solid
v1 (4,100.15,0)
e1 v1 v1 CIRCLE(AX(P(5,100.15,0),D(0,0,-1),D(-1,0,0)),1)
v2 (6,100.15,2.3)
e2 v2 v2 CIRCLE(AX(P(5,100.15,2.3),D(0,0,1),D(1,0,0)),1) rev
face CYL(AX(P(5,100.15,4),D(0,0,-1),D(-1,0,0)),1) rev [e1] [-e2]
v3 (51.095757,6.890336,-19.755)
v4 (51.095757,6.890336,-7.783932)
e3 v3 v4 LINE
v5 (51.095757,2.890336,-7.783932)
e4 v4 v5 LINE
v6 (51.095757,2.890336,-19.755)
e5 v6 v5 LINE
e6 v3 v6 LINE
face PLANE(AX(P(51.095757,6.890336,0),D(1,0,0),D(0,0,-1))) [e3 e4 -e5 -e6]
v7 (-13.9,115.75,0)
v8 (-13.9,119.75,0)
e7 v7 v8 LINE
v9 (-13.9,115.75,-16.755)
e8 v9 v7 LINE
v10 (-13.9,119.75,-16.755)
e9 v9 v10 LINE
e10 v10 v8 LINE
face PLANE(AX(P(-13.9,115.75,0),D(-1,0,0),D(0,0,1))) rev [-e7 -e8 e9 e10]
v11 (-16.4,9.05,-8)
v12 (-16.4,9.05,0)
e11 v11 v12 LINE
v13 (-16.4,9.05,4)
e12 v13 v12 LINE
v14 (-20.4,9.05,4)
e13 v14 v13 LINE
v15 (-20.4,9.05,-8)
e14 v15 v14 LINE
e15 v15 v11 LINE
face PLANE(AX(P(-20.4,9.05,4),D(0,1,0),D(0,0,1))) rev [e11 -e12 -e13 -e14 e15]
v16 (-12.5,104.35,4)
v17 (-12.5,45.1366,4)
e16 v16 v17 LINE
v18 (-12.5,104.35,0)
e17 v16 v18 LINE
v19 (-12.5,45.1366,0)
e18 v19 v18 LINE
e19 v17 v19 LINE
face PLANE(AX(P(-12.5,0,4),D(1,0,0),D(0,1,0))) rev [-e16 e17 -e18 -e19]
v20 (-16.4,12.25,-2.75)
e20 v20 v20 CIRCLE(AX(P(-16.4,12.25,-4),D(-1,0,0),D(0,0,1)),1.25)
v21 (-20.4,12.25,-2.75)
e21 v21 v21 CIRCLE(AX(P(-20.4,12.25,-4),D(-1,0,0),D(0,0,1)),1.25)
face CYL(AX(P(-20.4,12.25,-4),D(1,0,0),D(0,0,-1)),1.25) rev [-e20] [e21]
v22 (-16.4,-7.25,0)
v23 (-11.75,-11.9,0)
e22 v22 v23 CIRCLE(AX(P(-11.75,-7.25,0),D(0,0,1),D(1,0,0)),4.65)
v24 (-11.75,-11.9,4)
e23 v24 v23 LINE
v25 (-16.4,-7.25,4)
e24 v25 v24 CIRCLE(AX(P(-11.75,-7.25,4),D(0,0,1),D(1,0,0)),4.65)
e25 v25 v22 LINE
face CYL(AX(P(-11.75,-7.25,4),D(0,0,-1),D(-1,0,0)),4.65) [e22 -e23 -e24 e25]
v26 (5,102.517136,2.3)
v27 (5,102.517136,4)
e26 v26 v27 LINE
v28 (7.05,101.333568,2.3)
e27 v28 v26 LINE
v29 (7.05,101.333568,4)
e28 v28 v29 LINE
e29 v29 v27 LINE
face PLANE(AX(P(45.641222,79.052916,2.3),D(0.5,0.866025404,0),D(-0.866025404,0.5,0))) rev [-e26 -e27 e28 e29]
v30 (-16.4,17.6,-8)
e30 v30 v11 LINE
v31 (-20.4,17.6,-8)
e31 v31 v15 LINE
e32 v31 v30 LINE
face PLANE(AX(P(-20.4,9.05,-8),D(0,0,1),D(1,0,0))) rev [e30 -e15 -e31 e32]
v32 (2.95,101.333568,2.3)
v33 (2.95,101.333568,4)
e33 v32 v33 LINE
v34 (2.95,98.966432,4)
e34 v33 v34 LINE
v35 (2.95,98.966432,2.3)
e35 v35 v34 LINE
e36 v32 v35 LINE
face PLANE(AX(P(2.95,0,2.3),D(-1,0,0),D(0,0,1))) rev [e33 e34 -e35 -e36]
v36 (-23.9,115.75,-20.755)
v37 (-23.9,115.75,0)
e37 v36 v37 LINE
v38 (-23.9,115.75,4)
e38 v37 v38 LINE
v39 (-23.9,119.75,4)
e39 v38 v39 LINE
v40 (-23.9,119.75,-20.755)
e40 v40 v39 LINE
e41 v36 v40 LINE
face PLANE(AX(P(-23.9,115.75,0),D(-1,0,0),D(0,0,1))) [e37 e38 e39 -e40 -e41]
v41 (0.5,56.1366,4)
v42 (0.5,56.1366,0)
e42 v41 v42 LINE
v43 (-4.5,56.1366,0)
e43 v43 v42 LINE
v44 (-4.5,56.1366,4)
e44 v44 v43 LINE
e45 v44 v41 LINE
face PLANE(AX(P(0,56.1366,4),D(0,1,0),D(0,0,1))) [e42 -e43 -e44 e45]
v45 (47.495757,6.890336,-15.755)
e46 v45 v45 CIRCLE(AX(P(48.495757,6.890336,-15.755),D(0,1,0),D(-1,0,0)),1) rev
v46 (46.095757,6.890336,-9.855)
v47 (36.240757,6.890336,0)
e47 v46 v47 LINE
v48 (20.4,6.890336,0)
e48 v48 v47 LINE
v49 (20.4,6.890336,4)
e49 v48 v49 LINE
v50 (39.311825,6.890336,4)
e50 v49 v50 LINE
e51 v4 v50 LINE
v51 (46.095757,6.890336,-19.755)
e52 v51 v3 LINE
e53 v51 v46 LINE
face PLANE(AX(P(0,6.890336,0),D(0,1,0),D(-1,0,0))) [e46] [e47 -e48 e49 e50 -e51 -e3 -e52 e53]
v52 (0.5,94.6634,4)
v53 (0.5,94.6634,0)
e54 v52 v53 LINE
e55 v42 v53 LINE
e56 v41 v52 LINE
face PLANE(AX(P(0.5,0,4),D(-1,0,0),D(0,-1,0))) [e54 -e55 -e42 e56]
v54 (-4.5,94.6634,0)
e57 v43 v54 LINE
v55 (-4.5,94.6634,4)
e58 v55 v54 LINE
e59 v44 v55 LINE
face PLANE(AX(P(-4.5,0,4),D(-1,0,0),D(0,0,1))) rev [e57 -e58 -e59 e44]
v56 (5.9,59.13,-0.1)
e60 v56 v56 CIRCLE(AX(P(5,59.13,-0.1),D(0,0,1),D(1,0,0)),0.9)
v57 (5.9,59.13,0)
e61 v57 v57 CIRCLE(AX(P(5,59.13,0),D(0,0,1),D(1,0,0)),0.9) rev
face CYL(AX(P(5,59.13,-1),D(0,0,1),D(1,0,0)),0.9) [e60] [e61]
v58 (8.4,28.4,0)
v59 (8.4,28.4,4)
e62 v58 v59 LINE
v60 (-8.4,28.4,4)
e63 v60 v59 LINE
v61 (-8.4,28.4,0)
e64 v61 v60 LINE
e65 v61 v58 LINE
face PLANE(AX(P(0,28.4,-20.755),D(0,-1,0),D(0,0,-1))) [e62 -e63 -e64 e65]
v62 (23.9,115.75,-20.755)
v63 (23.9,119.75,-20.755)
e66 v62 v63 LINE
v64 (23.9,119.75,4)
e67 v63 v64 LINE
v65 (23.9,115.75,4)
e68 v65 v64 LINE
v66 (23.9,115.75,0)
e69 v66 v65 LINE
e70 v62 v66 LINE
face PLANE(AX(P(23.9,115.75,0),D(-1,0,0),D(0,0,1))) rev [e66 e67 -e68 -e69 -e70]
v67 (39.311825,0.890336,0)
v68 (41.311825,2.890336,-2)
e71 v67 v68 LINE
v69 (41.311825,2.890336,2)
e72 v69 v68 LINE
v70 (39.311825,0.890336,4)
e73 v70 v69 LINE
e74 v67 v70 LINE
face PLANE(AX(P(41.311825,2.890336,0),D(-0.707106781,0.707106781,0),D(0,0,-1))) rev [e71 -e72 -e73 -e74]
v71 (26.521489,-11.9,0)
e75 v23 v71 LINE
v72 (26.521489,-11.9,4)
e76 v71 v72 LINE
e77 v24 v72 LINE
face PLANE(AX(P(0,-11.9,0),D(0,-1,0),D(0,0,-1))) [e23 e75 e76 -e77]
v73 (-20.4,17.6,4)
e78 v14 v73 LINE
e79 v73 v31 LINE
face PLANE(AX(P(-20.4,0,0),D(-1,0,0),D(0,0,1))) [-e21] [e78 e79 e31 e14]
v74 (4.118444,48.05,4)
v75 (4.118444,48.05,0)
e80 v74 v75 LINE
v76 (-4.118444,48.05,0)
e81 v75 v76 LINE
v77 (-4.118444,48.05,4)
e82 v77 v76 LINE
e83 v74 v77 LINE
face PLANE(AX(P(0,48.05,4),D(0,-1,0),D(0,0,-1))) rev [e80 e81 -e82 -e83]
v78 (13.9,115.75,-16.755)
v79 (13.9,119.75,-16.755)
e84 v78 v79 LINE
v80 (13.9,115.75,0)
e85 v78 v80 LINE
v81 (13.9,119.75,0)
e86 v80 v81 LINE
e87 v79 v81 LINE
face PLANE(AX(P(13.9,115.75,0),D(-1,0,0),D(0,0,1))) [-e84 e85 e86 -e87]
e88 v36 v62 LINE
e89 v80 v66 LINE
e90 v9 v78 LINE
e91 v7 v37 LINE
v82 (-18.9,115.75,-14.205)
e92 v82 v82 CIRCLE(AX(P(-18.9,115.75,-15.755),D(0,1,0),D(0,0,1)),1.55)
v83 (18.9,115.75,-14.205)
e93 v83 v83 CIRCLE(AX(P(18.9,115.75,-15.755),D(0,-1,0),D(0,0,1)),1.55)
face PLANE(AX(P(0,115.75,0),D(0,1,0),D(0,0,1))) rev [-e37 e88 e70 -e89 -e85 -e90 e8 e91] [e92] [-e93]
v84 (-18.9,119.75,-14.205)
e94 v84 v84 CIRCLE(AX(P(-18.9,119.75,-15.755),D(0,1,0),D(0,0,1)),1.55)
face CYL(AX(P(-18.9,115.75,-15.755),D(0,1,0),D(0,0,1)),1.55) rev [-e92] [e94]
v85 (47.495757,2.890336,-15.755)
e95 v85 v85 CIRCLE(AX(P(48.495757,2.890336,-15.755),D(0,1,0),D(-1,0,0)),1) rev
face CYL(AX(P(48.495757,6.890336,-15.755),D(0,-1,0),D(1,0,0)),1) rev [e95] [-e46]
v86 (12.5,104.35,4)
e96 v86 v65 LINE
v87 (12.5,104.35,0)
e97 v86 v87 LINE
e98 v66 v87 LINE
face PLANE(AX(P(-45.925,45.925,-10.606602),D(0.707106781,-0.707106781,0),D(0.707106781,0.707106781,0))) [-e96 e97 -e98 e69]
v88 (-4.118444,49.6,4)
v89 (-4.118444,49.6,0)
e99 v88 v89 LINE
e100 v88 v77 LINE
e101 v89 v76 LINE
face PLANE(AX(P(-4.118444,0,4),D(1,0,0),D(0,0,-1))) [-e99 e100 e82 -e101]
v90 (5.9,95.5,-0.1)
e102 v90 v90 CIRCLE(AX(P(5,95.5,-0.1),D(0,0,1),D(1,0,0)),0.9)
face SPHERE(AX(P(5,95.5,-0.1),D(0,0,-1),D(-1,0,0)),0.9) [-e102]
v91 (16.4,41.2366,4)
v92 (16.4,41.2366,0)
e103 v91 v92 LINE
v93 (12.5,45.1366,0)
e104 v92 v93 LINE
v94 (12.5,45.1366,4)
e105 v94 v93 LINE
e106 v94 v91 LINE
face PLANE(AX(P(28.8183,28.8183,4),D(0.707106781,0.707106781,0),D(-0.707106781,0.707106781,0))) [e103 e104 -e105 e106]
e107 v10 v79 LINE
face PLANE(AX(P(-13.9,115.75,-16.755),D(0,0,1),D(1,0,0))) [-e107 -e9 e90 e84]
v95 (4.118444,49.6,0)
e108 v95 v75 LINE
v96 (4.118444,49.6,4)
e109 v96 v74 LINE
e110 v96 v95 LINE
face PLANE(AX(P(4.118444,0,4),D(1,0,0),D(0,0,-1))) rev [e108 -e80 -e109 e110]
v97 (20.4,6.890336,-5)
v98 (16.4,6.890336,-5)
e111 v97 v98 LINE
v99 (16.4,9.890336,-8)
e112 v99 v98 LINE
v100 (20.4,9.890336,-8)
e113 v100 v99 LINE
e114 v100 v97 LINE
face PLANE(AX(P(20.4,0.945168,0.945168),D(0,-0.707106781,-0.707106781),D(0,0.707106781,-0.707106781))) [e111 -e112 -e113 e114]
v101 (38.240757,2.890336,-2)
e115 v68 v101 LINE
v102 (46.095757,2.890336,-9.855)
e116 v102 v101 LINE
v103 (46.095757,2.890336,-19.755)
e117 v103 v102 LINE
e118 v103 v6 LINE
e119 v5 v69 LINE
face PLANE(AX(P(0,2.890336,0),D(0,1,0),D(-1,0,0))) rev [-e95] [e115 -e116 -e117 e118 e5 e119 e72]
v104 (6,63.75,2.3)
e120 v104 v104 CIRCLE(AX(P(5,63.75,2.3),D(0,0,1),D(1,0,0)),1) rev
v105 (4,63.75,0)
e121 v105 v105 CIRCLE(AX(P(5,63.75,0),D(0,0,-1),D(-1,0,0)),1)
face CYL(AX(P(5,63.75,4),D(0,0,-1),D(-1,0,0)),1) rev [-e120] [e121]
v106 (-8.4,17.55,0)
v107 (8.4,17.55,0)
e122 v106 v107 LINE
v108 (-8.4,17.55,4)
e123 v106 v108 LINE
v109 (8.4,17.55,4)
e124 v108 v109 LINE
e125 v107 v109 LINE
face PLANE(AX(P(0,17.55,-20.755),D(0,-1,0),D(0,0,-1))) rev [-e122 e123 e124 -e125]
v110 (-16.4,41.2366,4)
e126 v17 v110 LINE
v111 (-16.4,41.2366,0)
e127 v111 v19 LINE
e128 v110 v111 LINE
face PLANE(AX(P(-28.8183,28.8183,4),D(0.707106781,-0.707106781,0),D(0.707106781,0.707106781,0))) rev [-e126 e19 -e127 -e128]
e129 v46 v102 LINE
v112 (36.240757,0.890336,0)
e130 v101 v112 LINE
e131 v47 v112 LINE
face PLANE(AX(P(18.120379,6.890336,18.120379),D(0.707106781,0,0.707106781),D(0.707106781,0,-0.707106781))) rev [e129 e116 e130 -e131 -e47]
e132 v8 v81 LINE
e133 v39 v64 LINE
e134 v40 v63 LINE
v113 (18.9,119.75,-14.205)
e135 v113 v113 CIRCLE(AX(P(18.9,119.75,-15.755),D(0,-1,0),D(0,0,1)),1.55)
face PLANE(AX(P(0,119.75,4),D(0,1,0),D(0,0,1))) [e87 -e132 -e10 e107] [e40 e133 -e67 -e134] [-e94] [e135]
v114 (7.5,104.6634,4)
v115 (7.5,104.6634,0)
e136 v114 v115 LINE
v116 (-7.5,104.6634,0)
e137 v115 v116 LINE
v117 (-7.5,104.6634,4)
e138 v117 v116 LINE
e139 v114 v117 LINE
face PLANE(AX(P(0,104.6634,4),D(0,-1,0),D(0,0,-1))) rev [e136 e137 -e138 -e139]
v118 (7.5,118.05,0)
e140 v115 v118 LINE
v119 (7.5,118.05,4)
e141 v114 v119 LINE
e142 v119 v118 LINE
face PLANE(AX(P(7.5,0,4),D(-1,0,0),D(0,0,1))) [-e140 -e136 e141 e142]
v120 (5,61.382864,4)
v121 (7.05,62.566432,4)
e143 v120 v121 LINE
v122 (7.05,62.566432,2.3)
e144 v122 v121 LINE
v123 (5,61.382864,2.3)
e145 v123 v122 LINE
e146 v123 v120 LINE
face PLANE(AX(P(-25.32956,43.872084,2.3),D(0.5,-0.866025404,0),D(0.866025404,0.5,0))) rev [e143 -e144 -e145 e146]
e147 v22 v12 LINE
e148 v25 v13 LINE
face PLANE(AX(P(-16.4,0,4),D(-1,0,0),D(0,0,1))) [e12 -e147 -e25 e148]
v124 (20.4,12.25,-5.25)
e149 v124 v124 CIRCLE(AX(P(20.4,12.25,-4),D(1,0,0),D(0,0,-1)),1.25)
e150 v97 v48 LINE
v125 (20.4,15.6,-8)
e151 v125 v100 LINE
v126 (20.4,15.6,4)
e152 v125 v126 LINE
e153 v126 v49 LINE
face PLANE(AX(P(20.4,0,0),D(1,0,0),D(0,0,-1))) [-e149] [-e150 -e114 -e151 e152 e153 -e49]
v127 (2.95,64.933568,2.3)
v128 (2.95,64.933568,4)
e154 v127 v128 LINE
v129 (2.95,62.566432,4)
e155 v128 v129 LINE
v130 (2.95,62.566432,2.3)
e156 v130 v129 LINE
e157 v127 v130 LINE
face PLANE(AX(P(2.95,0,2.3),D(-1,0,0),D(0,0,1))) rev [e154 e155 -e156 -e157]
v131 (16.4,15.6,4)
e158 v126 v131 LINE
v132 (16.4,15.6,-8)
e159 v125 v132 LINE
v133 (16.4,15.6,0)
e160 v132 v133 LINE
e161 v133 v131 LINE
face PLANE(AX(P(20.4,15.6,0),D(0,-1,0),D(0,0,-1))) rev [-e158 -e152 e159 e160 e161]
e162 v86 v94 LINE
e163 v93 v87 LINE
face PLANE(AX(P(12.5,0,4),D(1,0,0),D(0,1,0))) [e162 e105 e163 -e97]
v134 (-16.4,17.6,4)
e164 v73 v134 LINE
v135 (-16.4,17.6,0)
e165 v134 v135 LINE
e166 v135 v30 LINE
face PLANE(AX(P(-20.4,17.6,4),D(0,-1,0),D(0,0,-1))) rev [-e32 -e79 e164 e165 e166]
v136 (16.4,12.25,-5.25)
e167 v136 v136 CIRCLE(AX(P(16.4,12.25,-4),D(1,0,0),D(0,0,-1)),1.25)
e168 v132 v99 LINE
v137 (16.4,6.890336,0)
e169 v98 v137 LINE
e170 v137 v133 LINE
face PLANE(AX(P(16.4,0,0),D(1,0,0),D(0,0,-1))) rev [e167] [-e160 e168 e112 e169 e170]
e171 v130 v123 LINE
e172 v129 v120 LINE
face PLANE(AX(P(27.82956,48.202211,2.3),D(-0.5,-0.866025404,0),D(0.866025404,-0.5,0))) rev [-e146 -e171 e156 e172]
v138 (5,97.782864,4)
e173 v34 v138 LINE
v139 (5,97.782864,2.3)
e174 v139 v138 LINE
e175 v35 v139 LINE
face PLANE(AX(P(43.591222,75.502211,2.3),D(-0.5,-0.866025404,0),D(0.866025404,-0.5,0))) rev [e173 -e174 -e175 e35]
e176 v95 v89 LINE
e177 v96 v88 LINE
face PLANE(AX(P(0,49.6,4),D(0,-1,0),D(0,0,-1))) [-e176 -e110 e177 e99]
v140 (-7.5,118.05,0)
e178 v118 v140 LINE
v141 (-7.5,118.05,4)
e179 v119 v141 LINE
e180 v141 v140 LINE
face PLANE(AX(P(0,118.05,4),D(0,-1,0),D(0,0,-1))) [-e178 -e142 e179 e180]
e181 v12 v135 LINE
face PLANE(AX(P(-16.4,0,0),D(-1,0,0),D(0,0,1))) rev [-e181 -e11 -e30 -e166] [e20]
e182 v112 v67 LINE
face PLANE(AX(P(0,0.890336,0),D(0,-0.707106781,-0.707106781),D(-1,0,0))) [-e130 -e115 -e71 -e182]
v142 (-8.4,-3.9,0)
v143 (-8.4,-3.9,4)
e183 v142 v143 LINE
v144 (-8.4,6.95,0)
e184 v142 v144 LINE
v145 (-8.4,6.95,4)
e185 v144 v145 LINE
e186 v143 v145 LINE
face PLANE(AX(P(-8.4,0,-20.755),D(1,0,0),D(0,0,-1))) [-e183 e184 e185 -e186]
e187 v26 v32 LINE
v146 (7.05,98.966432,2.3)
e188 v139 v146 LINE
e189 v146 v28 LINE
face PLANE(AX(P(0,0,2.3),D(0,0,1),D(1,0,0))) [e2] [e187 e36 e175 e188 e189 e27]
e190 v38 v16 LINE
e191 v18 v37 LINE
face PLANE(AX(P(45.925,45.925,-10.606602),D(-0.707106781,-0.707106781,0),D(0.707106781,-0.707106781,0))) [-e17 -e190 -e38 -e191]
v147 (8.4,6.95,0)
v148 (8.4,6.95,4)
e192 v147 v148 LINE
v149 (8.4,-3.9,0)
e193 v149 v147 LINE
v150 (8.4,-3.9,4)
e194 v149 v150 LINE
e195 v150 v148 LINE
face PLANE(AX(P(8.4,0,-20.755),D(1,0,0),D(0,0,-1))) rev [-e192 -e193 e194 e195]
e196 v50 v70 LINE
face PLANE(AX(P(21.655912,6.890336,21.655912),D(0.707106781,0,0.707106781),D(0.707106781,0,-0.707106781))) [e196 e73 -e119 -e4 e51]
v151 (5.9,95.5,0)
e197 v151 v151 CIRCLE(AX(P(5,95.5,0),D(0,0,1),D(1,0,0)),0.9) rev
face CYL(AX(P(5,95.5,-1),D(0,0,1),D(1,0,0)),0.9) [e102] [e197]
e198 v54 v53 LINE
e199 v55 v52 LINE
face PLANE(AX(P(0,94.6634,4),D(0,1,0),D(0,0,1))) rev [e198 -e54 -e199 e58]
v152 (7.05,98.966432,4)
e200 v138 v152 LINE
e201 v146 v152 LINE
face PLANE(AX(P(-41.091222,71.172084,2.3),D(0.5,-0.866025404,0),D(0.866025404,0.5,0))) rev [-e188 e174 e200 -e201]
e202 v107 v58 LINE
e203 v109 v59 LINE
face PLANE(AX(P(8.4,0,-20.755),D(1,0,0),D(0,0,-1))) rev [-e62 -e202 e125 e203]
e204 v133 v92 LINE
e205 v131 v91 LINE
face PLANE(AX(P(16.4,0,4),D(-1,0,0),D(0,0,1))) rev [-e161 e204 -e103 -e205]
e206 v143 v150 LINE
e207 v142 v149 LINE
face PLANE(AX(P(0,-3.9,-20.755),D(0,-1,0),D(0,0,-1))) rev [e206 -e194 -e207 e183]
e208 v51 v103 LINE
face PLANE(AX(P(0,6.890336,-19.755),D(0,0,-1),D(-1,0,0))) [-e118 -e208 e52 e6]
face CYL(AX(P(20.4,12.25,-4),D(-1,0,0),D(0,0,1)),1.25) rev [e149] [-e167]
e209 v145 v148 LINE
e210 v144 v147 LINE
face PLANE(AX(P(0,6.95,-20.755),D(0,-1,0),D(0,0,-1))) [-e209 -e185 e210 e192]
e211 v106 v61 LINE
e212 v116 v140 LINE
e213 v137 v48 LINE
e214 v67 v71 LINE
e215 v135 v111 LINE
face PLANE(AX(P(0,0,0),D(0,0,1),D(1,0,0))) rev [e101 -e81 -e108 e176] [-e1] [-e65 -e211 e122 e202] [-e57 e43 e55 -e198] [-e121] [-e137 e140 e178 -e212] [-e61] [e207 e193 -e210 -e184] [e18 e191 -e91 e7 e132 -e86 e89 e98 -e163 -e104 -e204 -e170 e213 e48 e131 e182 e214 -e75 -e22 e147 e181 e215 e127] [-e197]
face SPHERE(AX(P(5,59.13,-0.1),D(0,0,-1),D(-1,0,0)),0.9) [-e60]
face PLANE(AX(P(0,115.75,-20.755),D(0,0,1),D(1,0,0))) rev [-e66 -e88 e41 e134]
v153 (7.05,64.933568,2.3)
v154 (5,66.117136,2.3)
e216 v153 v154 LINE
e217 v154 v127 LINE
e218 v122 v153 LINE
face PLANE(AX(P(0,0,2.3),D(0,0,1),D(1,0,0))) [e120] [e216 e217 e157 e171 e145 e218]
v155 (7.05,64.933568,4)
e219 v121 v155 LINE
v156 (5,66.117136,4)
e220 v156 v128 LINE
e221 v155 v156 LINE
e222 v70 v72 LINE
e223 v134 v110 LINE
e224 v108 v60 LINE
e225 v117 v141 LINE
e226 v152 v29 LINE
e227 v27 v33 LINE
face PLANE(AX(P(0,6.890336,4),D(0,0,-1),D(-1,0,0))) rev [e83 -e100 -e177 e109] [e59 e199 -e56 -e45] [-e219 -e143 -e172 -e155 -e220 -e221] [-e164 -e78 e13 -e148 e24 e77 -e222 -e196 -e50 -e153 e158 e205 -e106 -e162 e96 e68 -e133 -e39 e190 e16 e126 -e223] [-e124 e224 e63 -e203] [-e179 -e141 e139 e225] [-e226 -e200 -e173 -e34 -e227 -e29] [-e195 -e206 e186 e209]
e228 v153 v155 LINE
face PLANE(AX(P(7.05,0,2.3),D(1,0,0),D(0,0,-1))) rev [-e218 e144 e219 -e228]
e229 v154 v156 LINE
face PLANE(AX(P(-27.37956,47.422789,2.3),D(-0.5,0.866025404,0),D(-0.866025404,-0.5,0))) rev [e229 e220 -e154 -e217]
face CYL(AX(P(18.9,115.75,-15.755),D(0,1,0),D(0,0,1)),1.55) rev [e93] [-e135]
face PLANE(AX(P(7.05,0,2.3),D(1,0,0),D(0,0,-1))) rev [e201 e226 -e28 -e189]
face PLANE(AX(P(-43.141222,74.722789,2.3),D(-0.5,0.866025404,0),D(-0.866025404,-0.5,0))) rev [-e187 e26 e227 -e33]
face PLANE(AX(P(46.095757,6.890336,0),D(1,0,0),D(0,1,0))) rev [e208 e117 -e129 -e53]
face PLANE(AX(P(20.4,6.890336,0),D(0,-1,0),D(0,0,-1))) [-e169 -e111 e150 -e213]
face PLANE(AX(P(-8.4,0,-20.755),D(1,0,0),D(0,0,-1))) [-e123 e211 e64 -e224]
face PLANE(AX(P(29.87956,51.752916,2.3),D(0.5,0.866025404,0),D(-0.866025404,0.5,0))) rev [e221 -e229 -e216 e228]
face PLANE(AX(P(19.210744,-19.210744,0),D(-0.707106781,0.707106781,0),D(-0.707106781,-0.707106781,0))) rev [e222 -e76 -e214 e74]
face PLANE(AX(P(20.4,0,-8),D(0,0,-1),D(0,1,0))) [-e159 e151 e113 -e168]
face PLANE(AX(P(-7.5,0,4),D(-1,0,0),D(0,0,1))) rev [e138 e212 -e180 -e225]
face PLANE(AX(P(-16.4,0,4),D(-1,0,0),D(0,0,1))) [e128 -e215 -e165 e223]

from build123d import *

# Parameters (mm, degrees)
EXTRUDE_1_DEPTH     = 4
SKETCH_2_W          = 15
SKETCH_2_H          = 13.3866
CUT_EXTRUDE_1_DEPTH = 121.93395925
SKETCH_3_W          = 10
SKETCH_3_H          = 10
SKETCH_3_R          = 1.55
SKETCH_3_H_2        = 14.755
EXTRUDE_2_DEPTH     = 4
EXTRUDE_3_DEPTH     = 4
EXTRUDE_4_DEPTH     = 4
SKETCH_7_W          = 27.8
SKETCH_7_H          = 4
EXTRUDE_5_DEPTH     = 4
EXTRUDE_START       = -4
EXTRUDE_6_DEPTH     = 4
SKETCH_11_W         = 16.8
SKETCH_11_H         = 10.85
CUT_EXTRUDE_2_DEPTH = 133.52791749
CHAMFER_1_SIZE      = 2
CHAMFER_2_SIZE      = 2
SKETCH_12_W         = 12
SKETCH_12_H         = 8.55
SKETCH_12_R         = 1.25
EXTRUDE_7_DEPTH     = 4
EXTRUDE_START_2     = 4
SKETCH_13_R         = 1.25
SKETCH_13_W         = 4
SKETCH_13_H         = 8.709663749
EXTRUDE_8_DEPTH     = 4
SKETCH_14_R         = 1
CUT_EXTRUDE_3_DEPTH = 132.839329922
SKETCH_15_R         = 0.9
EXTRUDE_9_DEPTH     = 1
FILLET_1_R          = 0.9
CUT_EXTRUDE_START   = -1.7
SKETCH_16_R         = 1
CUT_EXTRUDE_4_DEPTH = 1.7
CUT_EXTRUDE_5_DEPTH = 132.839329922
SKETCH_19_W         = 5
SKETCH_19_H         = 38.5268
SKETCH_19_W_2       = 8.236887868
SKETCH_19_H_2       = 1.55
CUT_EXTRUDE_6_DEPTH = 132.839329922


with BuildPart() as part:
    # 草图1 → 凸台-拉伸1 (new body)
    with BuildSketch(Plane.XY):
        with BuildLine():
            Line((-16.4, -7.25), (-16.4, 119.75))
            Line((-16.4, 119.75), (16.4, 119.75))
            Line((16.4, 119.75), (16.4, -7.25))
            ThreePointArc((16.4, -7.25), (15.038046533, -10.538046533), (11.75, -11.9))
            Line((11.75, -11.9), (-11.75, -11.9))
            ThreePointArc((-11.75, -11.9), (-15.038046533, -10.538046533), (-16.4, -7.25))
        make_face()
    extrude(amount=EXTRUDE_1_DEPTH)

    # 草图2 → 切除-拉伸1 (cut, through all)
    with BuildSketch(Plane(origin=(0, 0, 0), x_dir=(-1, 0, 0), z_dir=(0, 0, -1))):
        with Locations((0, 111.3567)):
            Rectangle(SKETCH_2_W, SKETCH_2_H)
    extrude(amount=-CUT_EXTRUDE_1_DEPTH, mode=Mode.SUBTRACT)

    # 草图3 → 凸台-拉伸2 (add)
    # profile 1 of 2: a face of its own
    with BuildSketch(Plane(origin=(0, 119.75, 0), x_dir=(1, 0, 0), z_dir=(0, 1, 0))):
        with Locations((-18.9, 15.755)):
            Rectangle(SKETCH_3_W, SKETCH_3_H)
        with Locations(Location((-18.9, 15.755, 0), (0, 0, 270))):
            Circle(SKETCH_3_R, mode=Mode.SUBTRACT)
    # profile 2 of 2: a face of its own
    with BuildSketch(Plane(origin=(0, 119.75, 0), x_dir=(1, 0, 0), z_dir=(0, 1, 0))):
        with Locations((-18.9, 3.3775)):
            Rectangle(SKETCH_3_W, SKETCH_3_H_2)
    extrude_2 = extrude(amount=-EXTRUDE_2_DEPTH)

    # 镜向1: 凸台-拉伸2 across plane
    add(extrude_2.mirror(Plane(origin=(0, 0, 0), x_dir=(0, 0, 1), z_dir=(1, 0, 0))))

    # 草图6 → 凸台-拉伸4 (add)
    with BuildSketch(Plane.XY.offset(4)):
        Polygon((-16.4, 115.75), (-23.9, 115.75), (-16.4, 108.25), align=None)
        Polygon((16.4, 115.75), (16.4, 108.25), (23.9, 115.75), align=None)
    extrude(amount=-EXTRUDE_4_DEPTH)

    # 草图7 → 凸台-拉伸5 (add)
    with BuildSketch(Plane(origin=(0, 119.75, 0), x_dir=(1, 0, 0), z_dir=(0, 1, 0))):
        with Locations((0, 18.755)):
            Rectangle(SKETCH_7_W, SKETCH_7_H)
    extrude(amount=-EXTRUDE_5_DEPTH)



with BuildPart() as body_2:
    # 草图5 → 凸台-拉伸3 (new body)
    with BuildSketch(Plane(origin=(0, 2.890336251, 0), x_dir=(1, 0, 0), z_dir=(0, 1, 0))):
        Polygon((50.795757056, 9.855), (46.095757056, 9.855), (32.240757056, -4), (39.311824868, -4), (51.095757056, 7.783932188), (51.095757056, 9.855), align=None)
        with BuildLine():
            Line((50.795757056, 19.755), (46.095757056, 19.755))
            Line((46.095757056, 19.755), (46.095757056, 9.855))
            Line((46.095757056, 9.855), (50.795757056, 9.855))
            Line((50.795757056, 9.855), (50.795757056, 15.105))
            Line((50.795757056, 15.105), (49.255691264, 15.105))
            ThreePointArc((49.255691264, 15.105), (47.495757056, 15.755), (49.255691264, 16.405))
            Line((49.255691264, 16.405), (50.795757056, 16.405))
            Line((50.795757056, 16.405), (50.795757056, 19.755))
        make_face()
        with BuildLine():
            Line((51.095757056, 19.755), (50.795757056, 19.755))
            Line((50.795757056, 19.755), (50.795757056, 16.405))
            Line((50.795757056, 16.405), (49.255691264, 16.405))
            ThreePointArc((49.255691264, 16.405), (49.433822674, 16.10145764), (49.495757056, 15.755))
            ThreePointArc((49.495757056, 15.755), (49.433822674, 15.40854236), (49.255691264, 15.105))
            Line((49.255691264, 15.105), (50.795757056, 15.105))
            Line((50.795757056, 15.105), (50.795757056, 9.855))
            Line((50.795757056, 9.855), (51.095757056, 9.855))
            Line((51.095757056, 9.855), (51.095757056, 19.755))
        make_face()
    extrude(amount=EXTRUDE_3_DEPTH)


with BuildPart() as part_1:
    add(part.part)

    add(body_2.part)  # 凸台-拉伸6 merges body 2
    # 草图8 → 凸台-拉伸6 (add)
    with BuildSketch(Plane.XY.offset(4).offset(EXTRUDE_START)):
        with BuildLine():
            Line((26.521488617, -11.9), (39.311824868, 0.890336251))
            Line((39.311824868, 0.890336251), (39.311824868, 6.890336251))
            Line((39.311824868, 6.890336251), (16.4, 6.890336251))
            Line((16.4, 6.890336251), (16.4, -7.25))
            ThreePointArc((16.4, -7.25), (15.038046533, -10.538046533), (11.75, -11.9))
            Line((11.75, -11.9), (26.521488617, -11.9))
        make_face()
    extrude(amount=EXTRUDE_6_DEPTH)

    # 草图11 → 切除-拉伸2 (cut, through all)
    with BuildSketch(Plane.XY.offset(4)):
        with Locations((0, 1.525)):
            Rectangle(SKETCH_11_W, SKETCH_11_H)
        with Locations((0, 22.975)):
            Rectangle(SKETCH_11_W, SKETCH_11_H)
    extrude(amount=-CUT_EXTRUDE_2_DEPTH, mode=Mode.SUBTRACT)

    # 倒角1
    chamfer_1_edges = [part_1.edges().sort_by_distance(p)[0] for p in [
        (39.311824868, 2.890336251, 2),
    ]]
    chamfer(chamfer_1_edges, length=CHAMFER_1_SIZE - 0.0001)  # a hair under: the kernel refuses the full size

    # 倒角2
    chamfer_2_edges = [part_1.edges().sort_by_distance(p)[0] for p in [
        (38.776240962, 2.890336251, 0),
    ]]
    chamfer(chamfer_2_edges, length=CHAMFER_2_SIZE - 0.0001)  # a hair under: the kernel refuses the full size

    # 草图12 → 凸台-拉伸7 (add)
    with BuildSketch(Plane.ZY.offset(16.4)):
        with Locations((-2, 13.325)):
            Rectangle(SKETCH_12_W, SKETCH_12_H)
        with Locations((-4, 12.25)):
            Circle(SKETCH_12_R, mode=Mode.SUBTRACT)
    extrude(amount=EXTRUDE_7_DEPTH)

    # 草图13 → 凸台-拉伸8 (add)
    # profile 1 of 2: a face of its own
    with BuildSketch(Plane(origin=(16.4, 0, 0), x_dir=(0, 0, -1), z_dir=(1, 0, 0)).offset(EXTRUDE_START_2)):
        Polygon((8, 9.890336251), (8, 15.6), (0, 15.6), (0, 6.890336251), (5, 6.890336251), align=None)
        with Locations(Location((4, 12.25, 0), (0, 0, 180))):
            Circle(SKETCH_13_R, mode=Mode.SUBTRACT)
    # profile 2 of 2: a face of its own
    with BuildSketch(Plane(origin=(16.4, 0, 0), x_dir=(0, 0, -1), z_dir=(1, 0, 0)).offset(EXTRUDE_START_2)):
        with Locations((-2, 11.245168126)):
            Rectangle(SKETCH_13_W, SKETCH_13_H)
    extrude(amount=-EXTRUDE_8_DEPTH)

    # 草图14 → 切除-拉伸3 (cut, through all)
    with BuildSketch(Plane(origin=(0, 0, 0), x_dir=(-1, 0, 0), z_dir=(0, 0, -1))):
        with Locations((-5, 63.75)):
            Circle(SKETCH_14_R)
        with Locations((-5, 100.15)):
            Circle(SKETCH_14_R)
    extrude(amount=-CUT_EXTRUDE_3_DEPTH, mode=Mode.SUBTRACT)

    # 草图15 → 凸台-拉伸9 (add)
    with BuildSketch(Plane(origin=(0, 0, 0), x_dir=(-1, 0, 0), z_dir=(0, 0, -1))):
        with Locations(Location((-5, 95.5, 0), (0, 0, 180))):
            Circle(SKETCH_15_R)
        with Locations(Location((-5, 59.13, 0), (0, 0, 180))):
            Circle(SKETCH_15_R)
    extrude(amount=EXTRUDE_9_DEPTH)

    # 圆角1
    fillet_1_edges = [part_1.edges().sort_by_distance(p)[0] for p in [
        (4.1, 95.5, -1),
        (4.1, 59.13, -1),
    ]]
    fillet(fillet_1_edges, radius=FILLET_1_R)

    # 草图16 → 切除-拉伸4 (cut)
    # profile 1 of 2: a face of its own
    with BuildSketch(Plane.XY.offset(4).offset(CUT_EXTRUDE_START)):
        Polygon((7.05, 62.566431948), (7.05, 64.933568052), (5, 66.117136104), (2.95, 64.933568052), (2.95, 62.566431948), (5, 61.382863896), align=None)
        with Locations(Location((5, 63.75, 0), (0, 0, 180))):
            Circle(SKETCH_16_R, mode=Mode.SUBTRACT)
    # profile 2 of 2: a face of its own
    with BuildSketch(Plane.XY.offset(4).offset(CUT_EXTRUDE_START)):
        Polygon((2.95, 98.966431948), (5, 97.782863896), (7.05, 98.966431948), (7.05, 101.333568052), (5, 102.517136104), (2.95, 101.333568052), align=None)
        with Locations(Location((5, 100.15, 0), (0, 0, 180))):
            Circle(SKETCH_16_R, mode=Mode.SUBTRACT)
    extrude(amount=CUT_EXTRUDE_4_DEPTH, mode=Mode.SUBTRACT)

    # 草图17 → 切除-拉伸5 (cut, symmetric)
    with BuildSketch(Plane(origin=(0, 0, 0), x_dir=(-1, 0, 0), z_dir=(0, 0, -1))):
        Polygon((-12.5, 104.35), (-16.4, 108.25), (-16.4, 41.2366), (-12.5, 45.1366), align=None)
    cut_extrude_5 = extrude(amount=CUT_EXTRUDE_5_DEPTH, both=True, mode=Mode.SUBTRACT)

    # 镜向2: 切除-拉伸5 across plane
    add(cut_extrude_5.mirror(Plane(origin=(0, 0, 0), x_dir=(0, 0, 1), z_dir=(1, 0, 0))), mode=Mode.SUBTRACT)

    # 草图19 → 切除-拉伸6 (cut, through all)
    with BuildSketch(Plane(origin=(0, 0, 0), x_dir=(-1, 0, 0), z_dir=(0, 0, -1))):
        with Locations((2, 75.4)):
            Rectangle(SKETCH_19_W, SKETCH_19_H)
        with Locations((0, 48.825)):
            Rectangle(SKETCH_19_W_2, SKETCH_19_H_2)
    extrude(amount=-CUT_EXTRUDE_6_DEPTH, mode=Mode.SUBTRACT)


solid = part_1.part
